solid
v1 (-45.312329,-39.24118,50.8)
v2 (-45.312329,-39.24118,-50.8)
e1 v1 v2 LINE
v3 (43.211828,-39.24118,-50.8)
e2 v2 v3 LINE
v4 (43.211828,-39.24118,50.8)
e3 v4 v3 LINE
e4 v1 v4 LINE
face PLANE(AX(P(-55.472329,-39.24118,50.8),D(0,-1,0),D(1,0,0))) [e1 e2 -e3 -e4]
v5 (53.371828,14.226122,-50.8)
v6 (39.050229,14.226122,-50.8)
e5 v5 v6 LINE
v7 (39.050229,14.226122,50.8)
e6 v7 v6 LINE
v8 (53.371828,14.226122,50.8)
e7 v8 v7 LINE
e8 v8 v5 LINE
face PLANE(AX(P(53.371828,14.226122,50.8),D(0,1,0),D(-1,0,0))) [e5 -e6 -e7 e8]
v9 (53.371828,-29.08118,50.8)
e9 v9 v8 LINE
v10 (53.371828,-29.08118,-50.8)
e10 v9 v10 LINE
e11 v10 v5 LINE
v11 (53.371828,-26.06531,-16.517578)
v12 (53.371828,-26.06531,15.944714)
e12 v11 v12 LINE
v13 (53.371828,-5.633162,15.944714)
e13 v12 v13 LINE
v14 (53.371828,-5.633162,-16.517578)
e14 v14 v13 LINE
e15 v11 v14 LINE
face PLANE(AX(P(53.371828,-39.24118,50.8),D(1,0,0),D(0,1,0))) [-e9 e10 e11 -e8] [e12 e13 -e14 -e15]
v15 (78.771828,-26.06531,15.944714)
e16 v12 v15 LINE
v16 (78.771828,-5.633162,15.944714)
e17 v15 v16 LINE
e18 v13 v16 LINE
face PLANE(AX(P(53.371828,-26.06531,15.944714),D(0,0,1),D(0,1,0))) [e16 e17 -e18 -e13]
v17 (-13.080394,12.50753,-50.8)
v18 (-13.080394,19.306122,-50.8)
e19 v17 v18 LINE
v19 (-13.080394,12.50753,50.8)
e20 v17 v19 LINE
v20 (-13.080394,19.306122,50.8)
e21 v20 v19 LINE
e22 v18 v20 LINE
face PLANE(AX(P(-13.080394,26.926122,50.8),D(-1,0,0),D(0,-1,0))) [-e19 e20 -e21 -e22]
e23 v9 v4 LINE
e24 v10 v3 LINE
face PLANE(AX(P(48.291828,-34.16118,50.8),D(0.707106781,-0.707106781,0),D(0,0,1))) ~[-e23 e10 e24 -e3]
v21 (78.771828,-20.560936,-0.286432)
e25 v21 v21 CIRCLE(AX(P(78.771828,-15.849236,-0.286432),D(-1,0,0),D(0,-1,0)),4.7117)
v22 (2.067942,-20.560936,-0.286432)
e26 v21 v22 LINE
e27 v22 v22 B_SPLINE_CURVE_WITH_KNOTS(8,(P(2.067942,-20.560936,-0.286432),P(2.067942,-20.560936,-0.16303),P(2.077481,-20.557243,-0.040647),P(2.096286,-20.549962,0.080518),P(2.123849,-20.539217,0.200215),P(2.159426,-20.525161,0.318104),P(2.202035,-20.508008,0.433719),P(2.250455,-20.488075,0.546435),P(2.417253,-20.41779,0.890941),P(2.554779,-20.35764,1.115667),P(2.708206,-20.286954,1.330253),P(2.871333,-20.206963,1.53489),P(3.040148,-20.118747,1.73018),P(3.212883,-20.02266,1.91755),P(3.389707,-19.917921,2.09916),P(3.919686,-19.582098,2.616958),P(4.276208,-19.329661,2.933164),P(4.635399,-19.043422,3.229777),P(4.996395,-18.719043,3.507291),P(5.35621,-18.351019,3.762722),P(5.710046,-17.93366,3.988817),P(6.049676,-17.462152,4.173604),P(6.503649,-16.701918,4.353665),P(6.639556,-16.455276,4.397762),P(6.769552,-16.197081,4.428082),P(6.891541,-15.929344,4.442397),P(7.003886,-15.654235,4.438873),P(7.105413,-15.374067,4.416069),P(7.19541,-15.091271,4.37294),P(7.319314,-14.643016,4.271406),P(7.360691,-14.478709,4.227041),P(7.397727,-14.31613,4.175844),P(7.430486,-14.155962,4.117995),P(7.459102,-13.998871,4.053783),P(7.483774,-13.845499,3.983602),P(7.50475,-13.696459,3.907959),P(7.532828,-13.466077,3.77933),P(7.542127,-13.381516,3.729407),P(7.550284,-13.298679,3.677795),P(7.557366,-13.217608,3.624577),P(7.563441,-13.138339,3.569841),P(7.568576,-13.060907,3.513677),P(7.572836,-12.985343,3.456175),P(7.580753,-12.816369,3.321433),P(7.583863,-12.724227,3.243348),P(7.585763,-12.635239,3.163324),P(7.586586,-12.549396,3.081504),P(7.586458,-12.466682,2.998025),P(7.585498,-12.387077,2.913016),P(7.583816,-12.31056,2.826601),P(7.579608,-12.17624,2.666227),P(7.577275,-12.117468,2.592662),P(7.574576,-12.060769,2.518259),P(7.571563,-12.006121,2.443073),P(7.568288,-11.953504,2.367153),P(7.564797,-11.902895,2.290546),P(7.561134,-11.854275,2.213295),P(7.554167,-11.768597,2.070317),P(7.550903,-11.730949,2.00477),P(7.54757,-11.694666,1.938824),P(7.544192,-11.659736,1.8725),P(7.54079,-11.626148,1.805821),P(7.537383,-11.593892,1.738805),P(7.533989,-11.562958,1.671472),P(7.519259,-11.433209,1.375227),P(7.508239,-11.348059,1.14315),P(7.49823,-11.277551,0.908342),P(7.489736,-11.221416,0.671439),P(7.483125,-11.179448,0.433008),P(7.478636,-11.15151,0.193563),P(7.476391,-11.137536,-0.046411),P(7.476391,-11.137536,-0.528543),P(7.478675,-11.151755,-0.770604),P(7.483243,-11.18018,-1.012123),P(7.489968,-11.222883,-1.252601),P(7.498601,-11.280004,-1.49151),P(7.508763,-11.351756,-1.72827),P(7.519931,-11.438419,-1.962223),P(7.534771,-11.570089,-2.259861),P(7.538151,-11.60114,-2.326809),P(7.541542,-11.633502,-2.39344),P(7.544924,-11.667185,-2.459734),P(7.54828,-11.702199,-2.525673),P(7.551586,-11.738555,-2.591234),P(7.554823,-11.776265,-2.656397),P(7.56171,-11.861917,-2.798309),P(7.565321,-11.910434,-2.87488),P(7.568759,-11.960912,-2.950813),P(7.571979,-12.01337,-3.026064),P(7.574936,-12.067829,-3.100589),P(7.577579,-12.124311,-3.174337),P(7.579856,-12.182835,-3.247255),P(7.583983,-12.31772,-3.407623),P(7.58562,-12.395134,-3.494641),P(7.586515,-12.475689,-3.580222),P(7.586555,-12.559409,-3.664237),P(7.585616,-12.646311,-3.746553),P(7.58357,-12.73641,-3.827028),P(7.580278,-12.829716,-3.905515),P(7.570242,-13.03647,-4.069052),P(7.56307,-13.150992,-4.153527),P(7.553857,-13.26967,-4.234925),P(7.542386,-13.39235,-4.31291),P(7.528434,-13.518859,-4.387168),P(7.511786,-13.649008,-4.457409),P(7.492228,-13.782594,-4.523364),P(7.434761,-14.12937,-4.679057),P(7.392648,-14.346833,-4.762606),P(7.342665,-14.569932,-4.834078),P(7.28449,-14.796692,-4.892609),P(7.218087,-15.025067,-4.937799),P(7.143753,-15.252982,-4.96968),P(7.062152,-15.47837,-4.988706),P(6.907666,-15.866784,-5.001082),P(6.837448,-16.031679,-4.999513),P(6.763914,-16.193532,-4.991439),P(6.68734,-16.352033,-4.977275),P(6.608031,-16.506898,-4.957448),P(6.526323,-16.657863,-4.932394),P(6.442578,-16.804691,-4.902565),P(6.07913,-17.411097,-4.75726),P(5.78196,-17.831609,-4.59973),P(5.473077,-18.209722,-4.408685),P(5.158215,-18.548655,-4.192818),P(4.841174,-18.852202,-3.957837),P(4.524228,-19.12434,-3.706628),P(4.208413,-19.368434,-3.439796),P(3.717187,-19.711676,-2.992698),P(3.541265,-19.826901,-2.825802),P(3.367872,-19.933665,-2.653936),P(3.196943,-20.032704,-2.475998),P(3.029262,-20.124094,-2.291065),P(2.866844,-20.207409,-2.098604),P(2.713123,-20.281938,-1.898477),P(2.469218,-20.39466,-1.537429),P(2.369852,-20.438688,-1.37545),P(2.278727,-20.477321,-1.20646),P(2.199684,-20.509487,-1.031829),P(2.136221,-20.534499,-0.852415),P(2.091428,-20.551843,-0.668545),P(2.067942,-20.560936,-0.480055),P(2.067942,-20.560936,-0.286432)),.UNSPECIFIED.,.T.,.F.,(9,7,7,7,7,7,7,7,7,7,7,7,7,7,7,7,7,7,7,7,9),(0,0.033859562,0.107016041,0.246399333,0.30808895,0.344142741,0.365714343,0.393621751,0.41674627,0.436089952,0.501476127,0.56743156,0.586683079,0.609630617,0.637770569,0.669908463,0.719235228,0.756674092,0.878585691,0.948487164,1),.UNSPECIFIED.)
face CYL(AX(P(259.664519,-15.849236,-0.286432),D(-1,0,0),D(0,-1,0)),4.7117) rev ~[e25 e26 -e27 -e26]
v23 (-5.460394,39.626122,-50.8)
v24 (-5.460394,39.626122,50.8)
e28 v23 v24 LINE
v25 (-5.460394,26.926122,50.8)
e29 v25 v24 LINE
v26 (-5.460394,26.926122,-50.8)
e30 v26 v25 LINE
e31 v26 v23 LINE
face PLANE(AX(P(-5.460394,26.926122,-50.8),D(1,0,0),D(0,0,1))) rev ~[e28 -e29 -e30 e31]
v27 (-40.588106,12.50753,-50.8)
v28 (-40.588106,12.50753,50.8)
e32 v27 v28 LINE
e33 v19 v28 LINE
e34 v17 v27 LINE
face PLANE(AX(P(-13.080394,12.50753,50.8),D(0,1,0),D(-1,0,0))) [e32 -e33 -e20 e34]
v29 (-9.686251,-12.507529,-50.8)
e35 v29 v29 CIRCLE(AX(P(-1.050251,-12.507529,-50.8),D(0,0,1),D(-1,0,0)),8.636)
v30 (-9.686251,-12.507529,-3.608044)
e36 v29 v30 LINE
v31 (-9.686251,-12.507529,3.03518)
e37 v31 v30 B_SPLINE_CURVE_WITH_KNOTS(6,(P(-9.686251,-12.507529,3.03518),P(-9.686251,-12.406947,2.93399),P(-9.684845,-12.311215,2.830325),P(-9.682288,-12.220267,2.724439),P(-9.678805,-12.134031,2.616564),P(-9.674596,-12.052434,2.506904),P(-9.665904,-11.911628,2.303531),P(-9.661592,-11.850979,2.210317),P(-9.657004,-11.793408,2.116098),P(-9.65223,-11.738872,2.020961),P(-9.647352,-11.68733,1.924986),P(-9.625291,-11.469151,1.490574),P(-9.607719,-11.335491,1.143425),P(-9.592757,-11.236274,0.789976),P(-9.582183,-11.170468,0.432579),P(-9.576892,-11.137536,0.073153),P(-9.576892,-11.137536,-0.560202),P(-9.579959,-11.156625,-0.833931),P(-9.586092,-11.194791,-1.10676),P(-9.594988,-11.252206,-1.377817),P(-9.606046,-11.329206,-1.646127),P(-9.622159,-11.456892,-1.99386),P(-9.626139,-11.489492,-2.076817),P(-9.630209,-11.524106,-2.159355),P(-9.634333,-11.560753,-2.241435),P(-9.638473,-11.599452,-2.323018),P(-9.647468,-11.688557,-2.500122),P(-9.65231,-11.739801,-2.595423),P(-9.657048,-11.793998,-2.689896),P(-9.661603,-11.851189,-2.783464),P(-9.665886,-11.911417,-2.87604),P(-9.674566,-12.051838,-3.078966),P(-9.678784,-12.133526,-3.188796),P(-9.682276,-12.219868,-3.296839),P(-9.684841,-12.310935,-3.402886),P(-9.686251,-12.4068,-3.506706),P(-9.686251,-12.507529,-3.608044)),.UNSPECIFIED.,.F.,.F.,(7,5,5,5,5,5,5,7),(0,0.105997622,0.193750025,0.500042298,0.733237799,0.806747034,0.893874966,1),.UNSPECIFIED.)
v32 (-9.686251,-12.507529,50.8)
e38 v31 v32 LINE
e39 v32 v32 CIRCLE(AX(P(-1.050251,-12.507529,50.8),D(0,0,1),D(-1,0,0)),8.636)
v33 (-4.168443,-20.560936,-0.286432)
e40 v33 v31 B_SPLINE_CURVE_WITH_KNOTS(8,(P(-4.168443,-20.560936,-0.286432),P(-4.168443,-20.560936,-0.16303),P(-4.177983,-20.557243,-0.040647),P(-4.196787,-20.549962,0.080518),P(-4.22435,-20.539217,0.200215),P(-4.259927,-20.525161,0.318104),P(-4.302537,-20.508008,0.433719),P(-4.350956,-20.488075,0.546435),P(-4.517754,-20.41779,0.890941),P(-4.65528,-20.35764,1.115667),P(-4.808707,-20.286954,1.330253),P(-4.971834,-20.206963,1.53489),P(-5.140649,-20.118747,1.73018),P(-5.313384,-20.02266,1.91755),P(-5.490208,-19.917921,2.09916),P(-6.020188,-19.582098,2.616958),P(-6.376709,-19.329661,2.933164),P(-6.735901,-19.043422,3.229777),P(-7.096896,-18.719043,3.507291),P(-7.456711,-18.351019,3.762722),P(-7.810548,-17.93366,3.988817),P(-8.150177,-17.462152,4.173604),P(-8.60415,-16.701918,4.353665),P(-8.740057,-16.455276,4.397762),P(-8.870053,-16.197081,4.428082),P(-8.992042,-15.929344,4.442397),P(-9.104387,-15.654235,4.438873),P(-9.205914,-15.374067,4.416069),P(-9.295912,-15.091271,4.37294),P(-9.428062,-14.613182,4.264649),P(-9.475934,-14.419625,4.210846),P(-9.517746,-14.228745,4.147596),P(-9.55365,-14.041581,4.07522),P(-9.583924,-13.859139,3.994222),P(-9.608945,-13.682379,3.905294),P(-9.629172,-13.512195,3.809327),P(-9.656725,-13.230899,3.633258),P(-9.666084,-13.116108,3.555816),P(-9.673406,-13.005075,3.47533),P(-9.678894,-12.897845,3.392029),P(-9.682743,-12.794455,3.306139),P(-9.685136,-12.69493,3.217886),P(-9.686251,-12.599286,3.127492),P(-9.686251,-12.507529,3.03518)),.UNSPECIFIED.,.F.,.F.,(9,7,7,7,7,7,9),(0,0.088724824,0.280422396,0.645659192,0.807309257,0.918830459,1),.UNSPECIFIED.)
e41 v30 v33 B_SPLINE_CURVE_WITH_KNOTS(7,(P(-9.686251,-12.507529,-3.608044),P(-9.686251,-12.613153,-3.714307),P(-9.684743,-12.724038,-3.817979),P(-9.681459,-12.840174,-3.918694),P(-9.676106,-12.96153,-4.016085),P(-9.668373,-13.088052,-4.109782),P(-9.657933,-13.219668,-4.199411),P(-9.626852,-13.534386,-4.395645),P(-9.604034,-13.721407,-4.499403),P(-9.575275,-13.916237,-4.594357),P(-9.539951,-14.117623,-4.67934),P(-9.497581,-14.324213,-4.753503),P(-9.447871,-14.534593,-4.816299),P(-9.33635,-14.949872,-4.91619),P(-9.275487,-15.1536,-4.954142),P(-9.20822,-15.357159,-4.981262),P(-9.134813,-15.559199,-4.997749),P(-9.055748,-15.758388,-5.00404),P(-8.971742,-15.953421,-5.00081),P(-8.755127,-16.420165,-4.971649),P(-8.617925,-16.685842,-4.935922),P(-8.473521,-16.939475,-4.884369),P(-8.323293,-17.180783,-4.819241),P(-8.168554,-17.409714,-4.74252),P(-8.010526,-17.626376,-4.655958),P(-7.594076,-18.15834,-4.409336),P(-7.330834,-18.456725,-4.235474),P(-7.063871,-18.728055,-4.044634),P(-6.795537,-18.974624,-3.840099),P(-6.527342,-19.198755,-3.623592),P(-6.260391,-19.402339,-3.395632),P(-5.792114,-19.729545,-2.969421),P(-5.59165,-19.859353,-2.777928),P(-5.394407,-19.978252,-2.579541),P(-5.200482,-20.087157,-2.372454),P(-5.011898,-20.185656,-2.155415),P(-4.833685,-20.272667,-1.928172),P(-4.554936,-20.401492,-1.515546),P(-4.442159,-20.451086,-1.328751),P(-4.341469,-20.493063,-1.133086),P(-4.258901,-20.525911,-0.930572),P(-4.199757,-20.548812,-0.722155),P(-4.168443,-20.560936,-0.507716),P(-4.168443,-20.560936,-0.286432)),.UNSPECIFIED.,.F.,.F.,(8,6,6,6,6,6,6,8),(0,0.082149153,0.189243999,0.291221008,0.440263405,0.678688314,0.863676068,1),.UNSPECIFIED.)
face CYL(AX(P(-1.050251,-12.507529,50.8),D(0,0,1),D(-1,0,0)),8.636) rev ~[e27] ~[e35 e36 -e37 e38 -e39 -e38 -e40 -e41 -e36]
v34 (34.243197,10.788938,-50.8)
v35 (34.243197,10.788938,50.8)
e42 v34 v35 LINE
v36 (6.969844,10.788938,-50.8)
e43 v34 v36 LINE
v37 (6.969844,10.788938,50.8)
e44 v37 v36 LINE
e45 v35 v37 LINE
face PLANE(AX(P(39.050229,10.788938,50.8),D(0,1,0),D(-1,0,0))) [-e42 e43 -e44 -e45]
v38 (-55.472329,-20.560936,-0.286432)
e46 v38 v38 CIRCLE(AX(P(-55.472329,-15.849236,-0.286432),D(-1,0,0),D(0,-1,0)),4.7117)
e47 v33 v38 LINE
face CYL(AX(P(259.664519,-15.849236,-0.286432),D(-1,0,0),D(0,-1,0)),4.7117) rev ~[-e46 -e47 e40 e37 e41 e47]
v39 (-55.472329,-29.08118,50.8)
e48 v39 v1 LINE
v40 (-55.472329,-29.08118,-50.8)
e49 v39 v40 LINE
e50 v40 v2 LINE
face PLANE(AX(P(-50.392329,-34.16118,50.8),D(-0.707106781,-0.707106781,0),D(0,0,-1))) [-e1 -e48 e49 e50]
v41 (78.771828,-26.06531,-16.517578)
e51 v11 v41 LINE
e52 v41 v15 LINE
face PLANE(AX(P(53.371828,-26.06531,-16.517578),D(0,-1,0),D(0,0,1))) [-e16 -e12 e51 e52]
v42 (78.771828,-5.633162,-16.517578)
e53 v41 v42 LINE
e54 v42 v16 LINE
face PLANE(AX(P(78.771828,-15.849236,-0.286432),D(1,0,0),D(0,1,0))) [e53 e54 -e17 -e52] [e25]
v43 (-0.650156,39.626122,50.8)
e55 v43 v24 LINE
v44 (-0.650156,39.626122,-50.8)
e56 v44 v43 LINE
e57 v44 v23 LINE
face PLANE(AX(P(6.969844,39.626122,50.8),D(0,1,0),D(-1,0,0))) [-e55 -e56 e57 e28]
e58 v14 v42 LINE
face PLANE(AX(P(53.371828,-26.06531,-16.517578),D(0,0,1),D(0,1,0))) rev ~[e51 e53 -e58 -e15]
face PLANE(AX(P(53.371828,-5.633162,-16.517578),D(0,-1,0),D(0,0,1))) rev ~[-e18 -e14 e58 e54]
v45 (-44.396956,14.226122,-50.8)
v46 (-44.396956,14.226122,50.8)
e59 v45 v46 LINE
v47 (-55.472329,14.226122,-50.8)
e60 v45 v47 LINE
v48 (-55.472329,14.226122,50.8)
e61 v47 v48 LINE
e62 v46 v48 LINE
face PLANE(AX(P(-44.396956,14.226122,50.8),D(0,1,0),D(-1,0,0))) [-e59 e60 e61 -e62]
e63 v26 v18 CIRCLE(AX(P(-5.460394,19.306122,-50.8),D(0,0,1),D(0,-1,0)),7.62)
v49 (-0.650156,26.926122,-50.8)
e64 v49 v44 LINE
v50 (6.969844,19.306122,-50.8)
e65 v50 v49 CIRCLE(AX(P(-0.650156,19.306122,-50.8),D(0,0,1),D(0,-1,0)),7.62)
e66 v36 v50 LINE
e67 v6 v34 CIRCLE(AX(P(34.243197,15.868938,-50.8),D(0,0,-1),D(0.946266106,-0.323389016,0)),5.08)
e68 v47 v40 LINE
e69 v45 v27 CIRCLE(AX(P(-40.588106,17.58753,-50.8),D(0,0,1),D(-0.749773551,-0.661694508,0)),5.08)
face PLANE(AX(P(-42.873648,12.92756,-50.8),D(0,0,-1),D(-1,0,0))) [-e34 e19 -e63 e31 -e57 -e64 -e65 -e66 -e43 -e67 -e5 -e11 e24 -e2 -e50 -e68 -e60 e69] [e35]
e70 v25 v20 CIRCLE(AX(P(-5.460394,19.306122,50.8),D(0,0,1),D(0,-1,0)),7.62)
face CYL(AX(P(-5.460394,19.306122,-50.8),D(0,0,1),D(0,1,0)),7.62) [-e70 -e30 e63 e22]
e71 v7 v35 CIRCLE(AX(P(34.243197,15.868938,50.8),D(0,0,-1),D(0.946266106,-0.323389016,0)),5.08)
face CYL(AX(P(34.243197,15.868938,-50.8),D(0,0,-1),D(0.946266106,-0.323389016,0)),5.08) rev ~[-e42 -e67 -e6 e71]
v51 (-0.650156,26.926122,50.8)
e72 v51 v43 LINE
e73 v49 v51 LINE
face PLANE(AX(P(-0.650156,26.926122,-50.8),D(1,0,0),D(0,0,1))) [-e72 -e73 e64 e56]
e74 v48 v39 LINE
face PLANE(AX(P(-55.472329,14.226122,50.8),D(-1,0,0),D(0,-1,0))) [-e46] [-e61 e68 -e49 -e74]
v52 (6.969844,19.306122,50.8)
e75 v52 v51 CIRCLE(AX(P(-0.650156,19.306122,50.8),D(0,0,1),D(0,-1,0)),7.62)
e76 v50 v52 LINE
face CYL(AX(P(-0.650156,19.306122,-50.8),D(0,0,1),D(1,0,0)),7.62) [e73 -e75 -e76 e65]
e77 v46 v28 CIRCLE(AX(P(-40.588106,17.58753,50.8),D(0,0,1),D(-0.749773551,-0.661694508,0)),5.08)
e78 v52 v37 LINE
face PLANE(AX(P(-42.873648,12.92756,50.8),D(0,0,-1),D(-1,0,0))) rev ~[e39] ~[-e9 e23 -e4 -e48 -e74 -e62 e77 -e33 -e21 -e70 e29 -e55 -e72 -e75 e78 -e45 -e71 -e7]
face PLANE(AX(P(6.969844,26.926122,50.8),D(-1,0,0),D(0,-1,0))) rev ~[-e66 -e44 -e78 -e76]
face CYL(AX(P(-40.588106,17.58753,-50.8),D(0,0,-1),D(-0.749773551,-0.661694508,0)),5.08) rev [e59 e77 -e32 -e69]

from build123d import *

# Parameters (mm, degrees)
F1_DEPTH     = 50.8
F2_DEPTH     = 12.7
F4_D         = 17.272
F5_DEPTH     = 76.2
F6_DEPTH     = 76.2
F7_W         = 20.4321481287
F7_H         = 32.4622914195
F8_DEPTH     = 25.4
F9_R         = 7.62
F10_SIZE     = 10.16
F12_D        = 9.4234
F13_DEPTH    = 12.7
F14_T1_DEPTH = 101.6


# Not quite as in the source:
# - a fillet or chamfer that OpenCascade refuses, or shapes differently, is made with other operations: its cross-section is extruded or revolved along the edge and cut away or added


with BuildPart() as f1:
    # F0 (on Top) → F1 (new body, symmetric)
    with BuildSketch(Plane.XY):
        Polygon((-44.3969555199, 12.5075299293), (-44.3969555199, 14.226121828), (-55.4723292589, 14.226121828), (-55.4723292589, -39.2411798239), (53.3718280494, -39.2411798239), (53.3718280494, 14.226121828), (39.0502288938, 14.226121828), (39.0502288938, 10.7889380306), (6.9698439911, 10.7889380306), (6.9698439911, 14.226121828), (-13.0803938955, 14.226121828), (-13.0803938955, 12.5075299293), align=None)
    extrude(amount=F1_DEPTH, both=True)

    # F2 (add): a face of the model
    f2_faces = [f1.faces().sort_by_distance(p)[0] for p in [
        (-3.0552749522, 14.226121828, 0),
    ]]
    extrude(f2_faces, amount=F2_DEPTH)

    # F4 (through all)
    with Locations(Plane(origin=(0, 0, -50.8), x_dir=(1, 0, 0), z_dir=(0, 0, -1))):
        with Locations((-1.0502506047, 12.507528998)):
            Hole(F4_D / 2)

    # F5 (add): a face of the model
    f5_faces = [f1.faces().sort_by_distance(p)[0] for p in [
        (-45.6707358145, 13.3668258786, 50.8),
    ]]
    extrude(f5_faces, amount=-F5_DEPTH)

    # F6 (add): a face of the model
    f6_faces = [f1.faces().sort_by_distance(p)[0] for p in [
        (-45.6707358145, 13.3668258786, 50.8),
    ]]
    extrude(f6_faces, amount=-F6_DEPTH)

    # F7 (on face) → F8 (join)
    with BuildSketch(Plane.YZ.offset(53.3718280494)):
        with Locations((-15.8492363989, -0.2864319831)):
            Rectangle(F7_W, F7_H)
    extrude(amount=F8_DEPTH)

    # F9
    f9_edges = [f1.edges().sort_by_distance(p)[0] for p in [
        (-13.080394, 26.926122, 0),
        (6.969844, 26.926122, 0),
    ]]
    fillet(f9_edges, radius=F9_R)

    # F10
    f10_edges = [f1.edges().sort_by_distance(p)[0] for p in [
        (53.371828, -39.24118, 0),
        (-55.472329, -39.24118, 0),
    ]]
    chamfer(f10_edges, length=F10_SIZE)

    # F12 (through all)
    with Locations(Plane.YZ.offset(78.7718280494)):
        with Locations((-15.8492363989, -0.2864319831)):
            Hole(F12_D / 2)

    # F13 (add): a face of the model
    f13_faces = [f1.faces().sort_by_distance(p)[0] for p in [
        (-3.0552749522, 26.926121828, 0),
    ]]
    extrude(f13_faces, amount=F13_DEPTH)

    # F14: fillet of radius 5.08 on 2 edges, made by hand

    # F14_s2 → F14_t1 (join)
    with BuildSketch(Plane.XY.offset(-50.8)):
        with BuildLine():
            ThreePointArc((-44.3969555199, 14.226121828), (-42.6774175907, 12.9570681189), (-40.5881058804, 12.5075299293))
            Line((-40.5881058804, 12.5075299293), (-44.3969555199, 12.5075299293))
            Line((-44.3969555199, 12.5075299293), (-44.3969555199, 14.226121828))
        make_face()
        with BuildLine():
            ThreePointArc((39.0502288938, 14.226121828), (37.1979300298, 11.7366319971), (34.2431970731, 10.7889380306))
            Line((34.2431970731, 10.7889380306), (39.0502288938, 10.7889380306))
            Line((39.0502288938, 10.7889380306), (39.0502288938, 14.226121828))
        make_face()
    extrude(amount=F14_T1_DEPTH)


solid = f1.part
